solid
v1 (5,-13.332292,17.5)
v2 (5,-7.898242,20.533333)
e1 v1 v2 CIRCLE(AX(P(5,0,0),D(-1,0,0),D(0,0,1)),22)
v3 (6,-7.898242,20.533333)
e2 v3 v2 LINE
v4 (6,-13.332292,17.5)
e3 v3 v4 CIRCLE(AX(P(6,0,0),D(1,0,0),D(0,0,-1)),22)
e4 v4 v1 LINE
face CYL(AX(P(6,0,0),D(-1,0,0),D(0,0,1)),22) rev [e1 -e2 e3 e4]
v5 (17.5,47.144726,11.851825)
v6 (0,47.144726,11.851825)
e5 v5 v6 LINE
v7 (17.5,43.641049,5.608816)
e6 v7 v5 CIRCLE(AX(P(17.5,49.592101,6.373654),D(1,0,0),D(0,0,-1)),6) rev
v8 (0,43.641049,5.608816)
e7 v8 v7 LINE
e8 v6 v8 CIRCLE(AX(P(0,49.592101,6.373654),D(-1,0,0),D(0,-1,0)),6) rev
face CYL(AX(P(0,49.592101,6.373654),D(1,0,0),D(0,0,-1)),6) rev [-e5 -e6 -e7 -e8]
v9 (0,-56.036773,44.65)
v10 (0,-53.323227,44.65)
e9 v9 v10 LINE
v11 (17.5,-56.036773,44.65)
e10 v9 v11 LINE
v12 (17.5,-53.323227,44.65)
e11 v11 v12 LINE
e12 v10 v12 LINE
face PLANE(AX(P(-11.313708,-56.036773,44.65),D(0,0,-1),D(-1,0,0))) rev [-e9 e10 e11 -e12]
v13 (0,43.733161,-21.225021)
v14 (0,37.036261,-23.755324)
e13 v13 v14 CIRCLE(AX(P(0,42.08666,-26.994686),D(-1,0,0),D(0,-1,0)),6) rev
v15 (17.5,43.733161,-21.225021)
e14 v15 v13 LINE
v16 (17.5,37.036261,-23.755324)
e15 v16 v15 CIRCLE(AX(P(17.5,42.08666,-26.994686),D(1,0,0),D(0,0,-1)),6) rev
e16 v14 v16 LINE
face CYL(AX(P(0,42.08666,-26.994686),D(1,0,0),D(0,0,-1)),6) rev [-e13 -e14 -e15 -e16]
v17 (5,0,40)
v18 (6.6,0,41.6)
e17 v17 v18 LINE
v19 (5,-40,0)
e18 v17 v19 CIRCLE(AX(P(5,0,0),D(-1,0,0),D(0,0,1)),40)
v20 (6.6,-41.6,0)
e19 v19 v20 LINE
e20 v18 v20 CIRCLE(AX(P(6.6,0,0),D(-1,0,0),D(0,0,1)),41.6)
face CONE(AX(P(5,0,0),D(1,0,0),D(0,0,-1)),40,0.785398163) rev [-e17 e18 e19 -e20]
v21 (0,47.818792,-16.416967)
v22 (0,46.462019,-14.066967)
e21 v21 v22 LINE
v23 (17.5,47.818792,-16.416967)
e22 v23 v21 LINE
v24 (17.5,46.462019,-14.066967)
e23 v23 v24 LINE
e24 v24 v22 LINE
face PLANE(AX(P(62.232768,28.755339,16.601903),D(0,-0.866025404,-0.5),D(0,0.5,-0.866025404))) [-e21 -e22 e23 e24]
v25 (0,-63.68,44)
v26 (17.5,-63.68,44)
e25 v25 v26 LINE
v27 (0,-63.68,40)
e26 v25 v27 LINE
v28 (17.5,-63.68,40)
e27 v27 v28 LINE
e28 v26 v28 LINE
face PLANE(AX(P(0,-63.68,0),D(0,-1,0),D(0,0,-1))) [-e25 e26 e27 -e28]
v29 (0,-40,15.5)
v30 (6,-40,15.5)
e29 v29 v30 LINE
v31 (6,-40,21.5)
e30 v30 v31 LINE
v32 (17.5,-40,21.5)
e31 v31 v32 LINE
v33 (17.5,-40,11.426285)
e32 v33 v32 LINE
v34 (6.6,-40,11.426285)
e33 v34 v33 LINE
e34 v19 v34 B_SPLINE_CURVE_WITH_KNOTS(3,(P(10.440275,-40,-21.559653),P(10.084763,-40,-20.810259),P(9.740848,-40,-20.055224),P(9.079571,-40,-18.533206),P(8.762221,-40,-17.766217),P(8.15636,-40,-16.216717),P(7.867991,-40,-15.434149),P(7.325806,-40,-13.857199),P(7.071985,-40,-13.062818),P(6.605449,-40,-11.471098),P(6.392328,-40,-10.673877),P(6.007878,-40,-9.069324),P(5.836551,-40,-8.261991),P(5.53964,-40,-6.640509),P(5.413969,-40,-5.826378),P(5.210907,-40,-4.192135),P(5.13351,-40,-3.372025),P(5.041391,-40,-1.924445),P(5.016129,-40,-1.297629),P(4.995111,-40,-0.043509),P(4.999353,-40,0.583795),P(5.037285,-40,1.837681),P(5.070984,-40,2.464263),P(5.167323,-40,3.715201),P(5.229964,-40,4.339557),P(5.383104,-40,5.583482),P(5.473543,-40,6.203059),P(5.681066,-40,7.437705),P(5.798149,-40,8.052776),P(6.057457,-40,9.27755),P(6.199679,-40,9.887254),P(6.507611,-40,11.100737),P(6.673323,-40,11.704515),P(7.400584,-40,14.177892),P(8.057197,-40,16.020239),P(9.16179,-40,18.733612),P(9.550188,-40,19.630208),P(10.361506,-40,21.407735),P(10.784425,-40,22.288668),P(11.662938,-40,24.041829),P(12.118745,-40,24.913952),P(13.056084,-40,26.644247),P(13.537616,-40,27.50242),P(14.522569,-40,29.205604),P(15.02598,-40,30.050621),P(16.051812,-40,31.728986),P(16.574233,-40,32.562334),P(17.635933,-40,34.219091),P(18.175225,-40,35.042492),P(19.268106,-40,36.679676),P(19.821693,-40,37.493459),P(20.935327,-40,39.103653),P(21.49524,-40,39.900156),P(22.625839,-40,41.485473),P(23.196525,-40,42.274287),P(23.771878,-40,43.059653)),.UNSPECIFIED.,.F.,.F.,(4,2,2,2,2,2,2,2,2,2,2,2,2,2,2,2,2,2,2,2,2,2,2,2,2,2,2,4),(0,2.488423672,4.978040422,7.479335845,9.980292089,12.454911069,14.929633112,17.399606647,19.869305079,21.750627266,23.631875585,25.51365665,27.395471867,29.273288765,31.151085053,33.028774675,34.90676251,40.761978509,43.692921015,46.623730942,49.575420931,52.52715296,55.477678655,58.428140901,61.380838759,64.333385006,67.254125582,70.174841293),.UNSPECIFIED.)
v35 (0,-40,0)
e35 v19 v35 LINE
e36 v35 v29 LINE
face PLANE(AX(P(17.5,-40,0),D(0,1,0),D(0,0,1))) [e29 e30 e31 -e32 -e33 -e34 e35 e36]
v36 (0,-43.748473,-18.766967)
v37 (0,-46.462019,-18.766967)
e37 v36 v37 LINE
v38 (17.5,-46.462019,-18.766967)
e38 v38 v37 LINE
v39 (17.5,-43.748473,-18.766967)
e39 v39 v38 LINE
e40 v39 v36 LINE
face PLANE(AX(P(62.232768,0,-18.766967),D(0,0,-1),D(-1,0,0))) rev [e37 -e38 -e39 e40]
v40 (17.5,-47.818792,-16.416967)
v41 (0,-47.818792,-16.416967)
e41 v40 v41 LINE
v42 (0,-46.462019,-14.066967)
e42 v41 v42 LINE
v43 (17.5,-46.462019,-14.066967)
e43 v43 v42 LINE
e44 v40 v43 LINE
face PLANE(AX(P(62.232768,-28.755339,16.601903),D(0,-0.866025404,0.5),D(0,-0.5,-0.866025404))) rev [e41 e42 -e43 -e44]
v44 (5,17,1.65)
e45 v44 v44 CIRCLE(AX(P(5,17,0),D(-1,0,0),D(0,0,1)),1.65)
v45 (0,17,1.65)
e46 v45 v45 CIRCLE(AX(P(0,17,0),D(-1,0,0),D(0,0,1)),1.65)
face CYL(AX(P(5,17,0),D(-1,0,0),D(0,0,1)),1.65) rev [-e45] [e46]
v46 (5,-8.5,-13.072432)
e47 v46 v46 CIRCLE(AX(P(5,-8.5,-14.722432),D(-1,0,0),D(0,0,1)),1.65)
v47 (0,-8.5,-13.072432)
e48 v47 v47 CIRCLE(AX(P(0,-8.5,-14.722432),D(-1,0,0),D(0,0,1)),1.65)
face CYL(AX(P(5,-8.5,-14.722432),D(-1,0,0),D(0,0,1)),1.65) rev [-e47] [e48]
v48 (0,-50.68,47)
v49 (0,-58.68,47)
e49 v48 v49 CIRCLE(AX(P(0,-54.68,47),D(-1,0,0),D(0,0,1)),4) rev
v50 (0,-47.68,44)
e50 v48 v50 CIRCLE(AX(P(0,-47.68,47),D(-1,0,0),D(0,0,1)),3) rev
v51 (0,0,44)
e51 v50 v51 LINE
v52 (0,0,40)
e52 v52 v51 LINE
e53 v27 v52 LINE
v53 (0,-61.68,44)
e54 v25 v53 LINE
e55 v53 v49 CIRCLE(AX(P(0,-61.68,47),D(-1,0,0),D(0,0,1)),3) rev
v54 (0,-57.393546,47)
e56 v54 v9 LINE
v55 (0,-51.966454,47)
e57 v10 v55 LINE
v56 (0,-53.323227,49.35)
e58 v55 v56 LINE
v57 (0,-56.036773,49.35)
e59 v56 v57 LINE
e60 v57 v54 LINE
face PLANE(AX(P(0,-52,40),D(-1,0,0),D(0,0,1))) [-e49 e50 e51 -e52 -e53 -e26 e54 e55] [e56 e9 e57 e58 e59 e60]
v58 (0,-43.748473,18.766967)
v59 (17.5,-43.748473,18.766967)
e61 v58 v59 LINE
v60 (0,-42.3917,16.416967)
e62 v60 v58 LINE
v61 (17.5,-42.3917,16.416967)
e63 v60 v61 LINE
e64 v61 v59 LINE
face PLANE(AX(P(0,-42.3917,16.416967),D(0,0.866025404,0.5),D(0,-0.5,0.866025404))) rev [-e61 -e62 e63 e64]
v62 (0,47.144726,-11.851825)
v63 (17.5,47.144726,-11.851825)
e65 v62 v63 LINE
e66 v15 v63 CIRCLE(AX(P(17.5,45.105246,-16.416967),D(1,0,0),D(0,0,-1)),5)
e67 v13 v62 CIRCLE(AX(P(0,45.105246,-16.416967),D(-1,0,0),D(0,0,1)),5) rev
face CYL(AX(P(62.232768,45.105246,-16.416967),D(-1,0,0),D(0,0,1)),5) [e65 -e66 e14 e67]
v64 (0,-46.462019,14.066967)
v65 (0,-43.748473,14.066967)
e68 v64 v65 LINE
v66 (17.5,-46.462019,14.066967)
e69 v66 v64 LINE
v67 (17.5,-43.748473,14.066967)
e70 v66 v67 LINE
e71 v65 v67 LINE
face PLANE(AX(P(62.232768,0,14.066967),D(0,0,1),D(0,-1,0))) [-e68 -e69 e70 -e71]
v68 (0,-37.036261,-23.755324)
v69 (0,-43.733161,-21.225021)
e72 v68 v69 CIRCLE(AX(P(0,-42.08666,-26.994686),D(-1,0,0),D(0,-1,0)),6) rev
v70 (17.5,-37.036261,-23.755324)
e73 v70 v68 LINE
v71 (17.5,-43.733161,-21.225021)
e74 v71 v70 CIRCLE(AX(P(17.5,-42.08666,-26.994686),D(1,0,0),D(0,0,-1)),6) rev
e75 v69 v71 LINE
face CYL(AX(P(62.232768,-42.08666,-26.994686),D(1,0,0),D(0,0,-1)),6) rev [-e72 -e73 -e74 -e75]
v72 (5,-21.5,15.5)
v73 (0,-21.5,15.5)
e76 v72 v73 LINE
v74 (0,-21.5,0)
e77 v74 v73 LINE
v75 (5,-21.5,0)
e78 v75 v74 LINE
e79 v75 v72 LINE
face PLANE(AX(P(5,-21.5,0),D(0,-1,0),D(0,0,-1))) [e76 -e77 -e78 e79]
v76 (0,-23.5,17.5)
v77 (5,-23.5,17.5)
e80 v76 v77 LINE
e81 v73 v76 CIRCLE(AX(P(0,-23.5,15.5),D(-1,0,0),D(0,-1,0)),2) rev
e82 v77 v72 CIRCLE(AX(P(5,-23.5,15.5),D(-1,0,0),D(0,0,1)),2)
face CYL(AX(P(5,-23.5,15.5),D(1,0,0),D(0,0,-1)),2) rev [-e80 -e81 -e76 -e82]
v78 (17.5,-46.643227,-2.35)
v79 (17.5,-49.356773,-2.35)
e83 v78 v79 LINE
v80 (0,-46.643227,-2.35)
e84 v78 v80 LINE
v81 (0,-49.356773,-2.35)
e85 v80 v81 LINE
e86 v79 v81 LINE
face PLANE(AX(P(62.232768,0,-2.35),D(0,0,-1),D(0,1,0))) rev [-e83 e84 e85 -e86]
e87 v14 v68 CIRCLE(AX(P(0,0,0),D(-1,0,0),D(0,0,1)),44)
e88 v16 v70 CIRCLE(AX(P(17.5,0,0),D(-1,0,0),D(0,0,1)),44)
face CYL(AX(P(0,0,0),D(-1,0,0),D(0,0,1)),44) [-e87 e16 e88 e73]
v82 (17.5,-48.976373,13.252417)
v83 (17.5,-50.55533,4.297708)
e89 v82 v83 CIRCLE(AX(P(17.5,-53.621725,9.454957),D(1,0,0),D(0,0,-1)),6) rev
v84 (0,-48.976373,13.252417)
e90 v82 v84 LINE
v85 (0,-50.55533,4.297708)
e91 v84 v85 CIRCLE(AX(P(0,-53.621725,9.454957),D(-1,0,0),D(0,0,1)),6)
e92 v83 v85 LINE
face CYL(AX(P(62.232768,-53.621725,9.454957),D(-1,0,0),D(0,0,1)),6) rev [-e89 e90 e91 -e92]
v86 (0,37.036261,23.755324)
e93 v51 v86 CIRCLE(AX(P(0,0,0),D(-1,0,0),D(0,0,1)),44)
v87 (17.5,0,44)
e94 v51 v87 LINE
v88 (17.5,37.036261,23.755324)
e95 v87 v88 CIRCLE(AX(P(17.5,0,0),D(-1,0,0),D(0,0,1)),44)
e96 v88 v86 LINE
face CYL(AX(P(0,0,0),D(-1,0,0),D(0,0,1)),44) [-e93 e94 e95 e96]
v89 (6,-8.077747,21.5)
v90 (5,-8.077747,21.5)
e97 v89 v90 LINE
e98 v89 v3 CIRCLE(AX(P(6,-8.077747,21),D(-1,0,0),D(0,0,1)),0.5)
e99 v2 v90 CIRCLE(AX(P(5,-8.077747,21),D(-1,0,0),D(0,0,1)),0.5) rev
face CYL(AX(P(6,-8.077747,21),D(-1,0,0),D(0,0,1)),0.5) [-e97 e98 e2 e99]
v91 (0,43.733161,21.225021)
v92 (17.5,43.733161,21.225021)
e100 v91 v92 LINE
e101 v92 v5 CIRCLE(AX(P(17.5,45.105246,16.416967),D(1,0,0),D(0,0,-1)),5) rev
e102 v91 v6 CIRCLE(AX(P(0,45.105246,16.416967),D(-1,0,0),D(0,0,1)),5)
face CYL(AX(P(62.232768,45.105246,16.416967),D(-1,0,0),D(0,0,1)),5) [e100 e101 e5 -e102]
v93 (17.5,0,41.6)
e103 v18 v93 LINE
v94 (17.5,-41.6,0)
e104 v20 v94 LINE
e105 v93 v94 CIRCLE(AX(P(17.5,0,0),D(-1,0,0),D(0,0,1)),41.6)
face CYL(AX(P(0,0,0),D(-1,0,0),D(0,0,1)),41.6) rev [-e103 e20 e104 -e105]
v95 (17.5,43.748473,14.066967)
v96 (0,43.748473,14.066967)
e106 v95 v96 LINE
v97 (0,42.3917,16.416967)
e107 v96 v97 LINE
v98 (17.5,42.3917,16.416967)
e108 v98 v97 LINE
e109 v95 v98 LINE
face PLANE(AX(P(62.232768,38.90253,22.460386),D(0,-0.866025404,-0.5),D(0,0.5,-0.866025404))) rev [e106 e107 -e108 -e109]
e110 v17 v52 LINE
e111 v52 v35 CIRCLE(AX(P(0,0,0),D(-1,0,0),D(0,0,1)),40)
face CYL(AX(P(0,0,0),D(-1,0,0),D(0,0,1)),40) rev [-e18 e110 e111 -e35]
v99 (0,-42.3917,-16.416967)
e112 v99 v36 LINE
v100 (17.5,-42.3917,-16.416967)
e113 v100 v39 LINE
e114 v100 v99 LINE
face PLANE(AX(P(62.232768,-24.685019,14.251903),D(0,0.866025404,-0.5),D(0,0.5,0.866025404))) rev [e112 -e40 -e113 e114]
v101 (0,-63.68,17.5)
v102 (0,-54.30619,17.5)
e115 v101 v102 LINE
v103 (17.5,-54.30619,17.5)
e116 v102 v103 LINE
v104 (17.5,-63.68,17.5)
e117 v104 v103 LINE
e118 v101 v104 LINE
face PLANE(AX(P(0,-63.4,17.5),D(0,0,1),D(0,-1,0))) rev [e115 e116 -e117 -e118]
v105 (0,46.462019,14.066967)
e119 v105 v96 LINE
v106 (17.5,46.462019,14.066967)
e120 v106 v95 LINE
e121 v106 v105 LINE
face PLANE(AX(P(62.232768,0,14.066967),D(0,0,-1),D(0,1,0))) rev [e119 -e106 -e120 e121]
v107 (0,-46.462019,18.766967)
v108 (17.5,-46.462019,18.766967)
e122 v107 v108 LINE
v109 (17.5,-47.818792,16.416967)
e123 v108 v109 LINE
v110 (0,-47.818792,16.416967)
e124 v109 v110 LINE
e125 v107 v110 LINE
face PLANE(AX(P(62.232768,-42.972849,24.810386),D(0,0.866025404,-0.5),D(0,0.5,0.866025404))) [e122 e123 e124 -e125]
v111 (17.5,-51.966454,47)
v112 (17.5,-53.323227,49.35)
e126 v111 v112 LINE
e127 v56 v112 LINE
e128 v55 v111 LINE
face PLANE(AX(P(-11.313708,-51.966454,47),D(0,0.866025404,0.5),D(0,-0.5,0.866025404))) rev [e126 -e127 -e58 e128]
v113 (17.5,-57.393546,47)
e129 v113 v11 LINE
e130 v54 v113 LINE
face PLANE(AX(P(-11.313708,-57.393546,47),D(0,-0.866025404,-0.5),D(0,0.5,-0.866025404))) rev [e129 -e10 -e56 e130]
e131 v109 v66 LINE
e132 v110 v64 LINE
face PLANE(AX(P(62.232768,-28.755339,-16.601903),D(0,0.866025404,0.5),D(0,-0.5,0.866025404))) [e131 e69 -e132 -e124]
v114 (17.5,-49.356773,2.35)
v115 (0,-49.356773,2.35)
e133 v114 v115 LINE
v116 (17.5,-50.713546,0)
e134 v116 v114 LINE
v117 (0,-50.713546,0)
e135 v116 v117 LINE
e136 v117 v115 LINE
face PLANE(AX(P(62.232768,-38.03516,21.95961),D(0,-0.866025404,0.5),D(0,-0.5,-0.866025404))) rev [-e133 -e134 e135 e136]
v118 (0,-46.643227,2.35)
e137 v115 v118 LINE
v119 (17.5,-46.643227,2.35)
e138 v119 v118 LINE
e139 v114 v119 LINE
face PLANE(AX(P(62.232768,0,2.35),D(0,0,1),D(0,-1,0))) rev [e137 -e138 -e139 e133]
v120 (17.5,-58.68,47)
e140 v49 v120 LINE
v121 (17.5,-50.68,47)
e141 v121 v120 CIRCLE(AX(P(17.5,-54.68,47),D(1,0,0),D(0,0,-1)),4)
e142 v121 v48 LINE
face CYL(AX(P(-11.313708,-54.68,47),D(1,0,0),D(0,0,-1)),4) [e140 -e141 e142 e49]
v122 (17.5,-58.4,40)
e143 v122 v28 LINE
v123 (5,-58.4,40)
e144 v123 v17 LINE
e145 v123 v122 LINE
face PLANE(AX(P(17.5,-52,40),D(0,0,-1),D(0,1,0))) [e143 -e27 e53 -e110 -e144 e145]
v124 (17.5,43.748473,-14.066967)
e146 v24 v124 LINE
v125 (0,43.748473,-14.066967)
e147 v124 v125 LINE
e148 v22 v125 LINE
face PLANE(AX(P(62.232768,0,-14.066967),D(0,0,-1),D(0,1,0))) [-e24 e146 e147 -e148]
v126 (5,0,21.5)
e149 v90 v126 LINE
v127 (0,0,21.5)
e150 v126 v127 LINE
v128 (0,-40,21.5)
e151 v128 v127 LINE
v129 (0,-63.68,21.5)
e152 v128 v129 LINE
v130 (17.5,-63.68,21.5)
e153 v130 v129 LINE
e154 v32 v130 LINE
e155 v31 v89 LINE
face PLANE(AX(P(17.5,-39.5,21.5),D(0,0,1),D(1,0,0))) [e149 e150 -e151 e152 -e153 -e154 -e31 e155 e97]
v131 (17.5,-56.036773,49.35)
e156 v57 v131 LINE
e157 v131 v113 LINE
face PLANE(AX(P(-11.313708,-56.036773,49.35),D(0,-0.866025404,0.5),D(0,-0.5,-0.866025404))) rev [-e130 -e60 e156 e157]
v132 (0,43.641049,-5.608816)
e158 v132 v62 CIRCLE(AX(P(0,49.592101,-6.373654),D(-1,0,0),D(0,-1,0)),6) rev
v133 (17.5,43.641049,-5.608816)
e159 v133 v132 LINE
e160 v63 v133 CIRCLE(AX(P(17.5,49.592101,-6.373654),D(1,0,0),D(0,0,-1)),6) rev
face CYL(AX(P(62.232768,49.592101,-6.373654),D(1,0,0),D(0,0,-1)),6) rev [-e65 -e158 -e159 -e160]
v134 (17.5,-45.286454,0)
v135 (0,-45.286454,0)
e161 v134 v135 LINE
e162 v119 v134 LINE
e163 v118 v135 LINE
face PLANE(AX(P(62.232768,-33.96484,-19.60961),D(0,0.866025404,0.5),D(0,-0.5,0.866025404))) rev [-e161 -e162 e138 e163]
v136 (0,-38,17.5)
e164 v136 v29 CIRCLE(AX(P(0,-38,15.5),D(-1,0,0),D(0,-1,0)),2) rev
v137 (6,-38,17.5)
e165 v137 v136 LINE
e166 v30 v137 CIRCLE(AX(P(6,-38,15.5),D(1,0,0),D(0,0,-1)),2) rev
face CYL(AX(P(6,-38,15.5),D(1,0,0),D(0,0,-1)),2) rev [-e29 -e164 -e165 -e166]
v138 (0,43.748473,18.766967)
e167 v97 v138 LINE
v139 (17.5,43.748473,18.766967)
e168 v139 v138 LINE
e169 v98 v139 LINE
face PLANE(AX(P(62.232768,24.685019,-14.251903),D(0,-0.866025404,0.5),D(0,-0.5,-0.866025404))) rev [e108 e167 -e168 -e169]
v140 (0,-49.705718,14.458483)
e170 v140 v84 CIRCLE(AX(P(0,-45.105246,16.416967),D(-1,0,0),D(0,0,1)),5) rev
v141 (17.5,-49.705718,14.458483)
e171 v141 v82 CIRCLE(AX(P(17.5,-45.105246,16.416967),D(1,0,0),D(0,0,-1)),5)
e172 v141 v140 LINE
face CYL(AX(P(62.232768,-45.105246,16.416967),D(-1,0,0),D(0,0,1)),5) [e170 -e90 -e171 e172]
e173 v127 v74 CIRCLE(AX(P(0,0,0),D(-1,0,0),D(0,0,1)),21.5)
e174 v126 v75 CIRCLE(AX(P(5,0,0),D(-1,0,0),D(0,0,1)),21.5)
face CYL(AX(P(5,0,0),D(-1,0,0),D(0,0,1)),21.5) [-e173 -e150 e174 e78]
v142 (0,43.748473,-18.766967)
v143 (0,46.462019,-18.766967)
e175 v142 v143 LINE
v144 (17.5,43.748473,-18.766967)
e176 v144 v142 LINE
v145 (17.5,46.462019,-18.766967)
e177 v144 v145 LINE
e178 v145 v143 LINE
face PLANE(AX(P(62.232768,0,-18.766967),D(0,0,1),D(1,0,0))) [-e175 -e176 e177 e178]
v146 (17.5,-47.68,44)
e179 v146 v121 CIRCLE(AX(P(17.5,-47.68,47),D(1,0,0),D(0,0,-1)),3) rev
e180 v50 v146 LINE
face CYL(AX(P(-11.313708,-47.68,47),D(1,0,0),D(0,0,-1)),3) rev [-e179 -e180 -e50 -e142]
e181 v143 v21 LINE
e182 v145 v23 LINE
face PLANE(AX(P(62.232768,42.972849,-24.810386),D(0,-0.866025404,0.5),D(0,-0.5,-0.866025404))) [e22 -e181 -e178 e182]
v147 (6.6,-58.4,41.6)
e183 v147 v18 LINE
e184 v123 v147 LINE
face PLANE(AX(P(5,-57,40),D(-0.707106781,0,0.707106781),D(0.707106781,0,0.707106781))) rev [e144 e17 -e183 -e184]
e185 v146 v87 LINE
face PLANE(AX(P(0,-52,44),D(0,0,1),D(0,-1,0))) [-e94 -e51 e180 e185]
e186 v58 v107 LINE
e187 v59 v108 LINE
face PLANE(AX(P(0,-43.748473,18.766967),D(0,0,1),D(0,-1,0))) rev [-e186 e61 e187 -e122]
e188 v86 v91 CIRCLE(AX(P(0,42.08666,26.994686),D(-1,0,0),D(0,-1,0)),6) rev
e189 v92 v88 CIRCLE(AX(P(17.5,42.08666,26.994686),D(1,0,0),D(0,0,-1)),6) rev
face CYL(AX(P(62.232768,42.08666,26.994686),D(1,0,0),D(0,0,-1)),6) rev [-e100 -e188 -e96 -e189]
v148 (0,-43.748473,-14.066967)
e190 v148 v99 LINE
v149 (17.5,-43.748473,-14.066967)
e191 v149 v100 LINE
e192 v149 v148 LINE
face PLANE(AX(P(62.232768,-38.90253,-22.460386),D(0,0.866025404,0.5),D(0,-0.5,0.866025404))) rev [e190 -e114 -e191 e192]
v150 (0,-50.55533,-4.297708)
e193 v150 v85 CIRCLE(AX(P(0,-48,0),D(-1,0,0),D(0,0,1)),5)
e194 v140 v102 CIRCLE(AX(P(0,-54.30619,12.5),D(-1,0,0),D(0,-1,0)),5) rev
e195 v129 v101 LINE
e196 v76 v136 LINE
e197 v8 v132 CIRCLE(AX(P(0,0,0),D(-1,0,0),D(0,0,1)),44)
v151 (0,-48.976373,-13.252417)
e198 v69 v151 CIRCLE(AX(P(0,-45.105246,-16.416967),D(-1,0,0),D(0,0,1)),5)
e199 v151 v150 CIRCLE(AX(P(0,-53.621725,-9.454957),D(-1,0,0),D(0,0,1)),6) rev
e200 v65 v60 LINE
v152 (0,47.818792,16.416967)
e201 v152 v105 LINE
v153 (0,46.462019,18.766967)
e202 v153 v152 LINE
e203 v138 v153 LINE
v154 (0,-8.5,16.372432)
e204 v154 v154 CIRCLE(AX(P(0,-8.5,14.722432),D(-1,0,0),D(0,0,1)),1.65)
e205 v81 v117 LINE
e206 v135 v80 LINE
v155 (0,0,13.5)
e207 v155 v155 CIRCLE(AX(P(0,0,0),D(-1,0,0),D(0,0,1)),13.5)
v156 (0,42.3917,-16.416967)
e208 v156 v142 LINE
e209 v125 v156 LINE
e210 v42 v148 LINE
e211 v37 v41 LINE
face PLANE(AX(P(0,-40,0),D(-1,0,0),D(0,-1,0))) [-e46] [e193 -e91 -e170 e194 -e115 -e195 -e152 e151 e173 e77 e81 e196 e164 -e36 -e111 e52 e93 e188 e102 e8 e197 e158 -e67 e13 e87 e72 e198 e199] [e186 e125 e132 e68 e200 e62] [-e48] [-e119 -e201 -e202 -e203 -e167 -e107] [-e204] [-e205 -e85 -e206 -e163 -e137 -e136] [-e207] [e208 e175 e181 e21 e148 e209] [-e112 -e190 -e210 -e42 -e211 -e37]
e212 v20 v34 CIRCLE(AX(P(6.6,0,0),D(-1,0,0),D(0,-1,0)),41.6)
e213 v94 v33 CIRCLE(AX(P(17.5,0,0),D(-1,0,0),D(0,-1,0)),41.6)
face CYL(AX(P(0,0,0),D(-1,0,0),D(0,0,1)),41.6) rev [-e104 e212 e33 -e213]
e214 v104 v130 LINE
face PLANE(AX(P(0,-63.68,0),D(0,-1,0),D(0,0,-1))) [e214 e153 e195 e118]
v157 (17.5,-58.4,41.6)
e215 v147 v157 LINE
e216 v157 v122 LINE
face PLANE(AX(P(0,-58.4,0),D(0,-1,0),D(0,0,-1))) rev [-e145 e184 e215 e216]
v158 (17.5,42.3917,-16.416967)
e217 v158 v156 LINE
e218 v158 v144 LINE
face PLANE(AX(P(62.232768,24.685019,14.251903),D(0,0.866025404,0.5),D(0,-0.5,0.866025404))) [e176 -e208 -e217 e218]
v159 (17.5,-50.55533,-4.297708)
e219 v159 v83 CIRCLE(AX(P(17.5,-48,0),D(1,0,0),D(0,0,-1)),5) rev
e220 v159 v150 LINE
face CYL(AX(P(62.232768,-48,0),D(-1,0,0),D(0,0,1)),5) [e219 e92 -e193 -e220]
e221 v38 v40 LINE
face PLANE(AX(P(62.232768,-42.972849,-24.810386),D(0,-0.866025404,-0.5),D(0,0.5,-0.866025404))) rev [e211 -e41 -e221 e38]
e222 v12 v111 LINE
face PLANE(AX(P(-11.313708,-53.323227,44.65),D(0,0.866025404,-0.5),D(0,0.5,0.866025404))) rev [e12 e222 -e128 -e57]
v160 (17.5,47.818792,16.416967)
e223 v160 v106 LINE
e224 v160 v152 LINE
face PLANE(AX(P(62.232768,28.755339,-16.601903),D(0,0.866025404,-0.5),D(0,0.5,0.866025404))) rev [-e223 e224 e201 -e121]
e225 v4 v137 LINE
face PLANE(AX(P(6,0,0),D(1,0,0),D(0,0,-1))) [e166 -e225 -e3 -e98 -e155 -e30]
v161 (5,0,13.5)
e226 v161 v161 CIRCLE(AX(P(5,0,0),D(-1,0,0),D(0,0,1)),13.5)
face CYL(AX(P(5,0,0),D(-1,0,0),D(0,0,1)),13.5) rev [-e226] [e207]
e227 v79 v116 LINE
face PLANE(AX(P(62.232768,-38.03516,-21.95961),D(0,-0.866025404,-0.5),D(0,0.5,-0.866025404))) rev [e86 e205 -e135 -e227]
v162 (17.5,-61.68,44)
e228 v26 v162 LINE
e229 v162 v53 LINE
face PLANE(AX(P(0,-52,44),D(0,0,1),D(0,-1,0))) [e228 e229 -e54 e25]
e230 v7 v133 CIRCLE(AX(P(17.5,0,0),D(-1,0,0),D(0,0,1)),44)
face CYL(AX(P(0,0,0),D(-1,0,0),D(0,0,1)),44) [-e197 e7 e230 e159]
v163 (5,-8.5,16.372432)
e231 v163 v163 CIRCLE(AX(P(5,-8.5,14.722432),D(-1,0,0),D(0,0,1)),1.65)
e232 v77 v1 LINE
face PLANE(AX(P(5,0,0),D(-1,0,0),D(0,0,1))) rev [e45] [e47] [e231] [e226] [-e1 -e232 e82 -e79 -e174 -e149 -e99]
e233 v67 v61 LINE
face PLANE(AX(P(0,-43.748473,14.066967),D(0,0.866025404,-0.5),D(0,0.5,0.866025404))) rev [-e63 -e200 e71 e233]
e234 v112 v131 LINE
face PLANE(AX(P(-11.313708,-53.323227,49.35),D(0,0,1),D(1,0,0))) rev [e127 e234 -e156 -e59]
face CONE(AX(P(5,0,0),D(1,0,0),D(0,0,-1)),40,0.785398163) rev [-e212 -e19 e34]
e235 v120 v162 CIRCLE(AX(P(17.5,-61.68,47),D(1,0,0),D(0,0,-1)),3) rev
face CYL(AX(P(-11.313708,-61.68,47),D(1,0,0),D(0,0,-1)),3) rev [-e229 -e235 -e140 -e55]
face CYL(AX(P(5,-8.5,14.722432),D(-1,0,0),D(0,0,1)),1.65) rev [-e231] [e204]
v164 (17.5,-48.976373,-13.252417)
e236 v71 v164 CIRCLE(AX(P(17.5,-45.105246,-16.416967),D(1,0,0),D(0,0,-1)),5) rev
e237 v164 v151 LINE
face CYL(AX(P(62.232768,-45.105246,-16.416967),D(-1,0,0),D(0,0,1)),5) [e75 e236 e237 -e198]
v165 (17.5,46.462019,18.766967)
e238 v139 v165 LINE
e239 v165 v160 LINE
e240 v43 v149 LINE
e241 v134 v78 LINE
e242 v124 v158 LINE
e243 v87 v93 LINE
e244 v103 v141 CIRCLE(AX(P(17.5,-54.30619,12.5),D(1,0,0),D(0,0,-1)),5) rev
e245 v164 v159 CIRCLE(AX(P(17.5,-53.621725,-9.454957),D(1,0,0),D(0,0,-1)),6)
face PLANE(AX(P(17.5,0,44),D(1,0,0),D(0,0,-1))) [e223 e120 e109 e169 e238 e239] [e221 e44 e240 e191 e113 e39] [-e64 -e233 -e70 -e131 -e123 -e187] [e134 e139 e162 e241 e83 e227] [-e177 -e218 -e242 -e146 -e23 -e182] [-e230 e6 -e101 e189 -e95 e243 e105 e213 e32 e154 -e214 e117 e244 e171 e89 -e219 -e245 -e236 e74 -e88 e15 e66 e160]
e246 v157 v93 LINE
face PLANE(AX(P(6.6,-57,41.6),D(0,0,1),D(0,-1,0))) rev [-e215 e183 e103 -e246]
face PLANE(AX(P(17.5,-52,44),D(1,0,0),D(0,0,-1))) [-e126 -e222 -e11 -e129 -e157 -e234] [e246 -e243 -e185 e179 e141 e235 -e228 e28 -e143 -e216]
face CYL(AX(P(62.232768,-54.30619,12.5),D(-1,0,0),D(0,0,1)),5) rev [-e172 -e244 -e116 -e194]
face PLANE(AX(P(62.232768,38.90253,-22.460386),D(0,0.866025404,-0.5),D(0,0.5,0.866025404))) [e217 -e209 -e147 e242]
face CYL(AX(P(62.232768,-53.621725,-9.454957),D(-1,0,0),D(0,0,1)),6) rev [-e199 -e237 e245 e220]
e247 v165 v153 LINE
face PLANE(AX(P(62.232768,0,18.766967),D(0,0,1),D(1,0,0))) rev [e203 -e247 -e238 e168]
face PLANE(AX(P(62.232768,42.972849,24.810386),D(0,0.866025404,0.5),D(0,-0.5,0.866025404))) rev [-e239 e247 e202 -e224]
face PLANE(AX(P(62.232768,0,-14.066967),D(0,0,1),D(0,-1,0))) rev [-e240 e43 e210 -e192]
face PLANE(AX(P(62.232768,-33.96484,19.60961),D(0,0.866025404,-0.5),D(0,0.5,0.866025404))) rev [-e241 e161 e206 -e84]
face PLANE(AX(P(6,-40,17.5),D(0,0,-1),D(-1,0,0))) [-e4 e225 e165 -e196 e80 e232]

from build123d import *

# Parameters (mm, degrees)
SKETCH_2_W           = 17.5
SKETCH_2_H           = 4
EXTRUDE_1_DEPTH      = 6
SKETCH_6_R           = 13.5
SKETCH_6_R_2         = 1.65
EXTRUDE_2_DEPTH      = 5
FILLET_1_R           = 2
EXTRUDE_START        = -17.5
SKETCH_7_R           = 5
EXTRUDE_3_DEPTH      = 17.5
FILLET_2_R           = 6
CUT_EXTRUDE_1_DEPTH  = 72.072146443
SKETCH_9_W           = 17.5
SKETCH_9_H           = 4
EXTRUDE_4_DEPTH      = 11.4
FILLET_3_R           = 5
EXTRUDE_5_DEPTH      = 0.28
EXTRUDE_5_DEPTH_BACK = 5
SKETCH_10_W          = 17.5
SKETCH_10_H          = 4
SKETCH_11_R          = 4
EXTRUDE_6_DEPTH      = 17.5
FILLET_4_R           = 3


with BuildPart() as part:
    # Sweep 1: sweep along a path in 草图1
    with BuildLine(Plane(origin=(0, 0, 0), x_dir=(0, 0, -1), z_dir=(1, 0, 0))) as sweep_1_path:
        Line((-44, -52), (-44, 0))
        ThreePointArc((-44, 0), (31.112698372, 31.112698372), (0, -44))
        Line((0, -44), (-17.5, -44))
        Line((-17.5, -44), (-17.5, -52))
    # 草图2 → Sweep 1 (sweep)
    with BuildSketch(Plane(origin=(0, -52, 0), x_dir=(1, 0, 0), z_dir=(0, 1, 0))):
        with Locations((8.75, -42)):
            Rectangle(SKETCH_2_W, SKETCH_2_H)
    sweep(path=sweep_1_path.line, transition=Transition.RIGHT)

    # Sweep 1 2: sweep along a path in 草图4
    with BuildLine(Plane.ZY) as sweep_1_2_path:
        Line((44, -52), (44, 0))
        ThreePointArc((44, 0), (-31.112698372, 31.112698372), (0, -44))
        ThreePointArc((0, -44), (12.692125838, -42.129680057), (24.3052364, -36.677724623))
    # 草图3 → Sweep 1 2 (sweep, cut)
    with BuildSketch(Plane(origin=(0, -52, 0), x_dir=(1, 0, 0), z_dir=(0, 1, 0))):
        Polygon((17.5, -40), (5, -40), (6.6, -41.6), (17.5, -41.6), align=None)
    sweep(path=sweep_1_2_path.line, mode=Mode.SUBTRACT)

    # 草图5 → 凸台-拉伸1 (add)
    with BuildSketch(Plane.ZY):
        with BuildLine():
            Line((21.5, -40), (21.5, -8.077747211))
            ThreePointArc((21.5, -8.077747211), (21.091287093, -7.586151171), (20.533333333, -7.898241717))
            ThreePointArc((20.533333333, -7.898241717), (19.209784895, -10.723066925), (17.5, -13.332291626))
            Line((17.5, -13.332291626), (17.5, -40))
            Line((17.5, -40), (21.5, -40))
        make_face()
    extrude(amount=-EXTRUDE_1_DEPTH)

    # 草图6 → 凸台-拉伸2 (add)
    with BuildSketch(Plane.ZY):
        with BuildLine():
            Line((21.5, -21.5), (21.5, -8.077747211))
            Line((21.5, -8.077747211), (21.5, 0))
            ThreePointArc((21.5, 0), (-15.202795796, 15.202795796), (0, -21.5))
            Line((0, -21.5), (21.5, -21.5))
        make_face()
        Circle(SKETCH_6_R, mode=Mode.SUBTRACT)
        with Locations((0, 17)):
            Circle(SKETCH_6_R_2, mode=Mode.SUBTRACT)
        with Locations((14.722431864, -8.5)):
            Circle(SKETCH_6_R_2, mode=Mode.SUBTRACT)
        with Locations((-14.722431864, -8.5)):
            Circle(SKETCH_6_R_2, mode=Mode.SUBTRACT)
    extrude(amount=-EXTRUDE_2_DEPTH)

    # 圆角1
    fillet_1_edges = [part.edges().sort_by_distance(p)[0] for p in [
        (3, -40, 17.5),
        (2.5, -21.5, 17.5),
    ]]
    fillet(fillet_1_edges, radius=FILLET_1_R)

    # 草图7 → 凸台-拉伸3 (add)
    # profile 1 of 7: a face of its own
    with BuildSketch(Plane.ZY.offset(EXTRUDE_START)):
        with BuildLine():
            ThreePointArc((-11.41696688, -45.105245798), (-11.647855738, -43.60338731), (-12.319198447, -42.240233778))
            ThreePointArc((-12.319198447, -42.240233778), (-15.048886306, -41.346475315), (-17.714445389, -40.276524485))
            ThreePointArc((-17.714445389, -40.276524485), (-20.865936265, -47.387058983), (-13.252416867, -48.976372665))
            ThreePointArc((-13.252416867, -48.976372665), (-11.899071902, -47.247353398), (-11.41696688, -45.105245798))
        make_face()
        Polygon((-14.06696688, -46.46201893), (-16.41696688, -47.818792063), (-18.76696688, -46.46201893), (-18.76696688, -43.748472665), (-16.41696688, -42.391699533), (-14.06696688, -43.748472665), align=None, mode=Mode.SUBTRACT)
    # profile 2 of 7: a face of its own
    with BuildSketch(Plane.ZY.offset(EXTRUDE_START)):
        with BuildLine():
            ThreePointArc((-4.29770766, -50.555329502), (-4.888687372, -46.950840441), (-2.870750936, -43.90625))
            ThreePointArc((-2.870750936, -43.90625), (-7.640519817, -43.331541133), (-12.319198447, -42.240233778))
            ThreePointArc((-12.319198447, -42.240233778), (-11.647855738, -43.60338731), (-11.41696688, -45.105245798))
            ThreePointArc((-11.41696688, -45.105245798), (-11.899071902, -47.247353398), (-13.252416867, -48.976372665))
            ThreePointArc((-13.252416867, -48.976372665), (-8.413067787, -47.712878387), (-4.29770766, -50.555329502))
        make_face()
    # profile 3 of 7: a face of its own
    with BuildSketch(Plane.ZY.offset(EXTRUDE_START)):
        with BuildLine():
            ThreePointArc((5, -48), (4.472135955, -45.763932023), (3, -44))
            ThreePointArc((3, -44), (1.58113883, -43.25658351), (0, -43))
            Line((0, -43), (0, -44))
            ThreePointArc((0, -44), (-1.436140662, -43.976556254), (-2.870750936, -43.90625))
            ThreePointArc((-2.870750936, -43.90625), (-4.888687372, -46.950840441), (-4.29770766, -50.555329502))
            ThreePointArc((-4.29770766, -50.555329502), (0, -53), (4.29770766, -50.555329502))
            ThreePointArc((4.29770766, -50.555329502), (4.821231083, -49.325039942), (5, -48))
        make_face()
        Polygon((-2.35, -46.643226867), (0, -45.286453735), (2.35, -46.643226867), (2.35, -49.356773133), (0, -50.713546265), (-2.35, -49.356773133), align=None, mode=Mode.SUBTRACT)
    # profile 4 of 7: a face of its own
    with BuildSketch(Plane.ZY.offset(EXTRUDE_START)):
        with BuildLine():
            Line((11.540653546, -44), (3, -44))
            ThreePointArc((3, -44), (4.472135955, -45.763932023), (5, -48))
            ThreePointArc((5, -48), (4.821231083, -49.325039942), (4.29770766, -50.555329502))
            ThreePointArc((4.29770766, -50.555329502), (8.413067787, -47.712878387), (13.252416867, -48.976372665))
            ThreePointArc((13.252416867, -48.976372665), (11.688865563, -46.731609207), (11.540653546, -44))
        make_face()
    # profile 5 of 7: a face of its own
    with BuildSketch(Plane.ZY.offset(EXTRUDE_START)):
        with Locations((16.41696688, -45.105245798)):
            Circle(SKETCH_7_R)
        Polygon((18.76696688, -46.46201893), (16.41696688, -47.818792063), (14.06696688, -46.46201893), (14.06696688, -43.748472665), (16.41696688, -42.391699533), (18.76696688, -43.748472665), align=None, mode=Mode.SUBTRACT)
    # profile 6 of 7: a face of its own
    with BuildSketch(Plane.ZY.offset(EXTRUDE_START)):
        with BuildLine():
            ThreePointArc((-11.41696688, 45.105245798), (-19.459384295, 49.07307849), (-17.714445389, 40.276524485))
            ThreePointArc((-17.714445389, 40.276524485), (-15.048886306, 41.346475315), (-12.319198447, 42.240233778))
            ThreePointArc((-12.319198447, 42.240233778), (-11.647855738, 43.60338731), (-11.41696688, 45.105245798))
        make_face()
        Polygon((-18.76696688, 43.748472665), (-18.76696688, 46.46201893), (-16.41696688, 47.818792063), (-14.06696688, 46.46201893), (-14.06696688, 43.748472665), (-16.41696688, 42.391699533), align=None, mode=Mode.SUBTRACT)
    # profile 7 of 7: a face of its own
    with BuildSketch(Plane.ZY.offset(EXTRUDE_START)):
        with BuildLine():
            ThreePointArc((21.41696688, 45.105245798), (14.915108391, 49.874356939), (12.319198447, 42.240233778))
            ThreePointArc((12.319198447, 42.240233778), (15.048886306, 41.346475315), (17.714445389, 40.276524485))
            ThreePointArc((17.714445389, 40.276524485), (20.384799572, 42.062828383), (21.41696688, 45.105245798))
        make_face()
        Polygon((14.06696688, 46.46201893), (16.41696688, 47.818792063), (18.76696688, 46.46201893), (18.76696688, 43.748472665), (16.41696688, 42.391699533), (14.06696688, 43.748472665), align=None, mode=Mode.SUBTRACT)
    extrude(amount=EXTRUDE_3_DEPTH)

    # 圆角2
    # the kernel refuses this fillet: 6 mm, written as the material it adds along each edge
    with BuildSketch(Plane(origin=(17.5, 40.276524485, -17.714445389), x_dir=(0, -0.4726837072692949, -0.8812321560645388), z_dir=(-1, 0, 0)), Plane(origin=(17.5, 42.240233778, 12.319198447), x_dir=(0, 0.20434838386912327, -0.978898226584397), z_dir=(-1, 0, 0))) as fillet_2_piece_1:
        with BuildLine():
            CenterArc((7.322424831, -5.98176794), FILLET_2_R, 94.467760731, 73.250864603)
            Line((1.459736191, -4.705491359), (1.342482418, -4.679965828))
            ThreePointArc((1.342482418, -4.679965828), (1.235040355, -2.196031285), (-0.082220104, -0.087406261))
            Line((-0.082220104, -0.087406261), (0.009347776, 0.119635359))
            ThreePointArc((0.009347776, 0.119635359), (3.427518006, -0.013701771), (6.845688236, 0.119635359))
            Line((6.845688236, 0.119635359), (6.855036012, 0))
        make_face()
    extrude(amount=17.5)
    with BuildSketch(Plane(origin=(17.5, 42.240233778, -12.319198447), x_dir=(0, 0.20434838386906956, 0.9788982265844082), z_dir=(-1, 0, 0)), Plane(origin=(17.5, 40.276524485, 17.714445389), x_dir=(0, -0.47268370726929204, 0.8812321560645403), z_dir=(-1, 0, 0)), Plane(origin=(17.5, -40.276524485, -17.714445389), x_dir=(0, 0.47268370726929143, -0.8812321560645405), z_dir=(-1, 0, 0))) as fillet_2_piece_2:
        with BuildLine():
            CenterArc((7.322424831, 5.98176794), FILLET_2_R, 192.281374666, 73.250864603)
            Line((1.459736191, 4.705491359), (1.342482418, 4.679965828))
            ThreePointArc((1.342482418, 4.679965828), (1.235040355, 2.196031285), (-0.082220104, 0.087406261))
            Line((-0.082220104, 0.087406261), (0.009347776, -0.119635359))
            ThreePointArc((0.009347776, -0.119635359), (3.427518006, 0.013701771), (6.845688236, -0.119635359))
            Line((6.845688236, -0.119635359), (6.855036012, 0))
        make_face()
    extrude(amount=17.5)
    with BuildSketch(Plane(origin=(0, -49.986540632, 17.5), x_dir=(0, -1, 0), z_dir=(1, 0, 0))) as fillet_2_piece_3:
        with BuildLine():
            CenterArc((5.420881339, 4.938570189), FILLET_2_R, 200.518106547, 34.877722735)
            Line((-0.198487483, 2.83554997), (-0.310874859, 2.793489565))
            ThreePointArc((-0.310874859, 2.793489565), (-0.013206953, 1.423797529), (-0.117151076, 0.025992795))
            Line((-0.117151076, 0.025992795), (0, -0.12))
            ThreePointArc((0, -0.12), (1.006729684, -0.12), (1.945310928, -0.098771404))
            Line((1.945310928, -0.098771404), (2.013459368, 0))
        make_face()
    extrude(amount=17.5)

    # 草图8 → 切除-拉伸1 (cut, through all)
    with BuildSketch(Plane(origin=(17.5, 0, 0), x_dir=(0, 0, -1), z_dir=(1, 0, 0))):
        Polygon((-14.06696688, -46.46201893), (-14.06696688, -43.748472665), (-16.41696688, -42.391699533), (-18.76696688, -43.748472665), (-18.76696688, -46.46201893), (-16.41696688, -47.818792063), align=None)
    extrude(amount=-CUT_EXTRUDE_1_DEPTH, mode=Mode.SUBTRACT)

    # 草图9 → 凸台-拉伸4 (add)
    with BuildSketch(Plane.XZ.offset(52)):
        with Locations((8.75, 19.5)):
            Rectangle(SKETCH_9_W, SKETCH_9_H)
        Polygon((6.6, 41.6), (17.5, 41.6), (17.5, 44), (0, 44), (0, 40), (5, 40), align=None)
    extrude(amount=EXTRUDE_4_DEPTH)

    # 圆角3
    fillet_3_edges = [part.edges().sort_by_distance(p)[0] for p in [
        (8.75, -52, 17.5),
    ]]
    fillet(fillet_3_edges, radius=FILLET_3_R)

    # 草图10 → 凸台-拉伸5 (add, two sides: drawn at the far end of the back side and taken through both)
    with BuildSketch(Plane.XZ.offset(63.4).offset(-EXTRUDE_5_DEPTH_BACK)):
        with Locations((8.75, 42)):
            Rectangle(SKETCH_10_W, SKETCH_10_H)
        with Locations((8.75, 19.5)):
            Rectangle(SKETCH_10_W, SKETCH_10_H)
    extrude(amount=EXTRUDE_5_DEPTH + EXTRUDE_5_DEPTH_BACK)

    # 草图11 → 凸台-拉伸6 (add)
    with BuildSketch(Plane(origin=(17.5, 0, 0), x_dir=(0, 0, -1), z_dir=(1, 0, 0))):
        with Locations((-47, -54.68)):
            Circle(SKETCH_11_R)
        Polygon((-44.65, -53.323226867), (-47, -51.966453735), (-49.35, -53.323226867), (-49.35, -56.036773133), (-47, -57.393546265), (-44.65, -56.036773133), align=None, mode=Mode.SUBTRACT)
    extrude(amount=-EXTRUDE_6_DEPTH)

    # 圆角4
    fillet_4_edges = [part.edges().sort_by_distance(p)[0] for p in [
        (8.75, -52.034248689, 44),
        (8.75, -57.325751311, 44),
    ]]
    fillet(fillet_4_edges, radius=FILLET_4_R)


solid = part.part
